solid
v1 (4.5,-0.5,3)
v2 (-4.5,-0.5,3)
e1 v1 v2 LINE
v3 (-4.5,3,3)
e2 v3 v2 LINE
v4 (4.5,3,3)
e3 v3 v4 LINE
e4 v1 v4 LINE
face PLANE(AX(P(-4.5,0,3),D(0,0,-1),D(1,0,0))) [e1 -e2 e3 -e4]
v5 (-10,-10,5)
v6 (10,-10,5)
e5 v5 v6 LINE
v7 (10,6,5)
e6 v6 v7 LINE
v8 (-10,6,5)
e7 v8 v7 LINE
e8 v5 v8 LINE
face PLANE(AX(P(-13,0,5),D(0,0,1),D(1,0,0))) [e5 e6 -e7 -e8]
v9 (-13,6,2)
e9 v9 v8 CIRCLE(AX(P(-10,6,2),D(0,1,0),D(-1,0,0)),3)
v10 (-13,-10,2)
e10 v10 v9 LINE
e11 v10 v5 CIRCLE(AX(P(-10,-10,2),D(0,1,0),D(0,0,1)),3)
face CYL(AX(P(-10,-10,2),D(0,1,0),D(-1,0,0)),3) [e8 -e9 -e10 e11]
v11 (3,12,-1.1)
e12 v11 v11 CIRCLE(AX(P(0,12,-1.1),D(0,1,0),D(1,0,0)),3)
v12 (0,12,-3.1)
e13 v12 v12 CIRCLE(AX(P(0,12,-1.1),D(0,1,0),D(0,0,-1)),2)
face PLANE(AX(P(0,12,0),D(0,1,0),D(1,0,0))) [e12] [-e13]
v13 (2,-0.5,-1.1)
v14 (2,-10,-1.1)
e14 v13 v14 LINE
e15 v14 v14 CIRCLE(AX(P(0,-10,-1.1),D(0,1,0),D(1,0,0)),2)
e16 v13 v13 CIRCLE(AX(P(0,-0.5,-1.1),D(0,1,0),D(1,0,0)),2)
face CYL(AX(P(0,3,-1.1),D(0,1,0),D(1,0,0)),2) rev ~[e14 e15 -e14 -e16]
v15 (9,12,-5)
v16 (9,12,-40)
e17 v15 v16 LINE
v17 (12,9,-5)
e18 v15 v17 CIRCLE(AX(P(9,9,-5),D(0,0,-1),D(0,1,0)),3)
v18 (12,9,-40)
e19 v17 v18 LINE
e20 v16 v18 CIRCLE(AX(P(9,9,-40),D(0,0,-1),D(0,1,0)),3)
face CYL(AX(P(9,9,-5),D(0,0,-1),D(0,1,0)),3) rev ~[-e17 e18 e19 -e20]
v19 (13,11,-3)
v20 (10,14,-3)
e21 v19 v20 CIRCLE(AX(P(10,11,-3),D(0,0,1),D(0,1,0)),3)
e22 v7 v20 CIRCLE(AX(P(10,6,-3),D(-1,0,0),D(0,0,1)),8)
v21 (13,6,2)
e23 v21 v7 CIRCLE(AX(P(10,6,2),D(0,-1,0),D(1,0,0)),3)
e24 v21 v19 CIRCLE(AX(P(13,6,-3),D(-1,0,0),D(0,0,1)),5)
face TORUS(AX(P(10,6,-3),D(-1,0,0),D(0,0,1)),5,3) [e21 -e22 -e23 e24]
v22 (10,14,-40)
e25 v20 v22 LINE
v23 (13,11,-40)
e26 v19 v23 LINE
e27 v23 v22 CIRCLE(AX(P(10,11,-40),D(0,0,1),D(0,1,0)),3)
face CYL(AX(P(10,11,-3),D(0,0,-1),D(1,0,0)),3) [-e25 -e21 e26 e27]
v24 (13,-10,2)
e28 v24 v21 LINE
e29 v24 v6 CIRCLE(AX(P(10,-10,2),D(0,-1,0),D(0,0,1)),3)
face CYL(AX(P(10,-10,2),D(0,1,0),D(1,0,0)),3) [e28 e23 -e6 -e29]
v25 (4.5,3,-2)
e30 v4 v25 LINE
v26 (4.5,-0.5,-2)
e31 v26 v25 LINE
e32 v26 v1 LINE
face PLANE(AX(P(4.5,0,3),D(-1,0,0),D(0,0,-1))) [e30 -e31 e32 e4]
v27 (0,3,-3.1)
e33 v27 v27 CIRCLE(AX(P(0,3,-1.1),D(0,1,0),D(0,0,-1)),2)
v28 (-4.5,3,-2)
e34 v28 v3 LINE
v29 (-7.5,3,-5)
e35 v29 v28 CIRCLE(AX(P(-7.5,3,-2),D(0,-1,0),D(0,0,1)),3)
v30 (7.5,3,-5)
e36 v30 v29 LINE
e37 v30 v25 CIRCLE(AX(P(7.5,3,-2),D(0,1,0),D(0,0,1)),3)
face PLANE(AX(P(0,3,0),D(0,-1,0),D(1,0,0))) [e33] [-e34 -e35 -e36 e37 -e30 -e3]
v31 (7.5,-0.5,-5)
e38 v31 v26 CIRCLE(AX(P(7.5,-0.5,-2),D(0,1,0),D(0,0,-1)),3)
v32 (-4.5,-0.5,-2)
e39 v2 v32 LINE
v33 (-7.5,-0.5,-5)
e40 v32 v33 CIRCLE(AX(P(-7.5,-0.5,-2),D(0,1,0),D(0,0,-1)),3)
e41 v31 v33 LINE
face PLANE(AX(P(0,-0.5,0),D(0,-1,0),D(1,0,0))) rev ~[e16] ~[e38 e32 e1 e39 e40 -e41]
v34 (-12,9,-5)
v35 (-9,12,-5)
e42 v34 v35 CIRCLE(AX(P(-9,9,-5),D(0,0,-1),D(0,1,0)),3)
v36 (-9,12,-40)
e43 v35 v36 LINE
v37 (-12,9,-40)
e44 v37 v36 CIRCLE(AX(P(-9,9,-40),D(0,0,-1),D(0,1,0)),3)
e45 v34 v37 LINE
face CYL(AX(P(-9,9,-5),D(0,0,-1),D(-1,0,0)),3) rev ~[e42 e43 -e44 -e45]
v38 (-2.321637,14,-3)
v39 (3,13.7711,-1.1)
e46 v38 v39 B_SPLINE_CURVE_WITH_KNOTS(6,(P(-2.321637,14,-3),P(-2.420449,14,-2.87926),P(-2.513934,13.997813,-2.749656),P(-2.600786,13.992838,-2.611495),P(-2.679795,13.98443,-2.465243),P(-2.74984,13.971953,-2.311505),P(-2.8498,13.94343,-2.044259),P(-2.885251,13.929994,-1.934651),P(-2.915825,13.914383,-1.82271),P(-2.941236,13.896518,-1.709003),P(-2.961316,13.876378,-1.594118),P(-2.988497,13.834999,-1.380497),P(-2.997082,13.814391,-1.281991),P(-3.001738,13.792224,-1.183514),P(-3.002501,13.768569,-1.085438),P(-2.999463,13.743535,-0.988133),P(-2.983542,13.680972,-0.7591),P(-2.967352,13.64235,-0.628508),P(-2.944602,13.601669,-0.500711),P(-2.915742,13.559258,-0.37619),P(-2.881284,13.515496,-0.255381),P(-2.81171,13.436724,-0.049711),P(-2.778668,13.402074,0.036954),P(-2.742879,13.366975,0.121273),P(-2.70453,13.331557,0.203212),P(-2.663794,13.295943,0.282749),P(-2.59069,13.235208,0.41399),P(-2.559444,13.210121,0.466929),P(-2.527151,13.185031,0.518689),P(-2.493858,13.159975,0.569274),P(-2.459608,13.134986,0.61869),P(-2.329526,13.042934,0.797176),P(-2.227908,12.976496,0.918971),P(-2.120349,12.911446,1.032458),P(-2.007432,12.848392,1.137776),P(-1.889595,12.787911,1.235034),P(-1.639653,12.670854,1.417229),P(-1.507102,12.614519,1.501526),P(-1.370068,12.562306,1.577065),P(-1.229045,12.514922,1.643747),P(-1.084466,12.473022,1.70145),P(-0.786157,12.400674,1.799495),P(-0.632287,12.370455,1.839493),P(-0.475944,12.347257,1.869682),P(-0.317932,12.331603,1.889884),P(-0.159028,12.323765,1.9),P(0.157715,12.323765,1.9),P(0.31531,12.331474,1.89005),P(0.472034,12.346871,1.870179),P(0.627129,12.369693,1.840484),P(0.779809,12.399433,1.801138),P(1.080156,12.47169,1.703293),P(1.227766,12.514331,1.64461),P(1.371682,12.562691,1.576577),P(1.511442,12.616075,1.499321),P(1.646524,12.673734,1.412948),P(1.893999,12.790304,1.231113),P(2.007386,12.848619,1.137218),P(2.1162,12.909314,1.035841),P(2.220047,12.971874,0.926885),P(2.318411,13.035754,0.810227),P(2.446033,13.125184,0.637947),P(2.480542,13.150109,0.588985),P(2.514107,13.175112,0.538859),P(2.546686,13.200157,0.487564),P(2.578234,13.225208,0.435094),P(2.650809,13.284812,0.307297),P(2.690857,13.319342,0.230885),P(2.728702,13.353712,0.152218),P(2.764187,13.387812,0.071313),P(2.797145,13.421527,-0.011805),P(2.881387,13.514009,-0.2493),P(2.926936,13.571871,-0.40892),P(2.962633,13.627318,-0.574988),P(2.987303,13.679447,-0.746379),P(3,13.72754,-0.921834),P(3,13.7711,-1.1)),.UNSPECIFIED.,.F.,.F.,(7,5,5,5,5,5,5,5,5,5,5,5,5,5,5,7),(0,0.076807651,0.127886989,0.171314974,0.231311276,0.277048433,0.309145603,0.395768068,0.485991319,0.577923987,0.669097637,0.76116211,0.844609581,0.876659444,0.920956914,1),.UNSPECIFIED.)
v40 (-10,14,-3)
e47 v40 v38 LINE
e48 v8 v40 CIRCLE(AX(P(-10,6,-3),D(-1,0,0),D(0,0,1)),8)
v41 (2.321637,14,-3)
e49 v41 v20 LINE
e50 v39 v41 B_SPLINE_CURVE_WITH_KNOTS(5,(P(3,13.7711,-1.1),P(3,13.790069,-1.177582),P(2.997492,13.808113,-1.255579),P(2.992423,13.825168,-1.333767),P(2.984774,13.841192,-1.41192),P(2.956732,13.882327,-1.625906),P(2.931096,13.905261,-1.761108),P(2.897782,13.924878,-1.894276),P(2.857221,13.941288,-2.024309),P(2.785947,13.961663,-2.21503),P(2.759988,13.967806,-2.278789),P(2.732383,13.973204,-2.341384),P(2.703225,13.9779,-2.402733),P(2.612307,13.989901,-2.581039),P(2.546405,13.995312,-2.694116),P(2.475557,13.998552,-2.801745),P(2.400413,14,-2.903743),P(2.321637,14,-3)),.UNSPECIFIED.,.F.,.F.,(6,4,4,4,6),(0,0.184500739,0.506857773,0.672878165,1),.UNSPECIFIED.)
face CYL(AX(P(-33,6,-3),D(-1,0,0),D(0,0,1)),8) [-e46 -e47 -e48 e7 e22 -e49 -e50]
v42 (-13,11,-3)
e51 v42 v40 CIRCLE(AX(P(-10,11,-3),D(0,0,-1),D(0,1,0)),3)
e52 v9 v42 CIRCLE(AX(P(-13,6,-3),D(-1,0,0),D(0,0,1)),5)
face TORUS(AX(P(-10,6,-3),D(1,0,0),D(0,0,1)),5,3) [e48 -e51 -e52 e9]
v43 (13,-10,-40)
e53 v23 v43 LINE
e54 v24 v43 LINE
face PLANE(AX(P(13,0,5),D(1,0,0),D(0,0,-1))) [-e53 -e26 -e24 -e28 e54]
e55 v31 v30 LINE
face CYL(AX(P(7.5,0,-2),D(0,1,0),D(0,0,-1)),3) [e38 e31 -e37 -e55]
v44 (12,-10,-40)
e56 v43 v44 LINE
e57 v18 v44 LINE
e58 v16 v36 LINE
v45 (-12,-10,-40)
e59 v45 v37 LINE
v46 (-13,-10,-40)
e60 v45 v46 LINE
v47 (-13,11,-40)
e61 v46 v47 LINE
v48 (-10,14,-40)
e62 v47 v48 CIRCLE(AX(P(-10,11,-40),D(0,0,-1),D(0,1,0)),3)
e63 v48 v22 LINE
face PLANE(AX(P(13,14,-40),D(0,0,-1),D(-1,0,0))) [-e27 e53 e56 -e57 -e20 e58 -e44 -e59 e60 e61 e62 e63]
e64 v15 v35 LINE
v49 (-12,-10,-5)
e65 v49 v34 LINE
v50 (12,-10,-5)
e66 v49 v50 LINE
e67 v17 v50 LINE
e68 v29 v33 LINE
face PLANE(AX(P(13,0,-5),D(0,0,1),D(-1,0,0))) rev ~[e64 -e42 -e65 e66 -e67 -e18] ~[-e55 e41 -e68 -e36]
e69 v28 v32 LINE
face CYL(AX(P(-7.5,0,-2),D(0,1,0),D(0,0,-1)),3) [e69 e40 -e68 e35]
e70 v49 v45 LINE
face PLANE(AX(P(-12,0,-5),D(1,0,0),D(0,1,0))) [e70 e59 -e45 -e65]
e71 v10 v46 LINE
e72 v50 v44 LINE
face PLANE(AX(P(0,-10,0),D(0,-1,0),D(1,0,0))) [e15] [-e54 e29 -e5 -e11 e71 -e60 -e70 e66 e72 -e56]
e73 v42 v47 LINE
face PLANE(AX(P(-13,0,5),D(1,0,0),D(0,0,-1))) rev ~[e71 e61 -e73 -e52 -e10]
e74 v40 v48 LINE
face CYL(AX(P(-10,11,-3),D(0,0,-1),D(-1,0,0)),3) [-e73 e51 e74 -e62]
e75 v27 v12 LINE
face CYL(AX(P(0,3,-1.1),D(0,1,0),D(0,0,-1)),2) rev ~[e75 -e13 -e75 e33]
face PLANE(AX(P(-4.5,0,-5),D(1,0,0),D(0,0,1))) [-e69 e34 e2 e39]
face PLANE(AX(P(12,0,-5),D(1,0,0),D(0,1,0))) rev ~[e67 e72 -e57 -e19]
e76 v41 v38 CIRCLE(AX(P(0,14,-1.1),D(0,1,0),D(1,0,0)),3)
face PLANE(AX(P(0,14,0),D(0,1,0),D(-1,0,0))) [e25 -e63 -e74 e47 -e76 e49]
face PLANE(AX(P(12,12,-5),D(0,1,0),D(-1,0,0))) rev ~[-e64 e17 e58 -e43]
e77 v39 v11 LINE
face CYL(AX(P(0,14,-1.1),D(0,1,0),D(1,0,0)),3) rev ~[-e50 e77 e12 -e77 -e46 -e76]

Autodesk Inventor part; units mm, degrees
ref_plane "YZ Plane" through (0, 0, 0) normal (1, 0, 0) x (0, 1, 0)
ref_plane "XZ Plane" through (0, 0, 0) normal (0, 1, 0) x (-1, 0, 0)
ref_plane "XY Plane" through (0, 0, 0) normal (0, 0, 1) x (1, 0, 0)
sketch "Sketch1" plane through (0, 0, 0) normal (0, 1, 0) x (-1, 0, 0)
  line L0 (-13, -5) -> (13, -5)
  line L1 (13, -5) -> (13, 5)
  line L2 (13, 5) -> (-13, 5)
  line L3 (-13, 5) -> (-13, -5)
  line L4 (-13, -5) -> (13, 5) construction
  line L5 (13, -5) -> (-13, 5) construction
  point P0 (0, 0)
  dimension "d0" = 26
  dimension "d1" = 10
extrude "Extrusion1" add sketch "Sketch1" along normal blind 14
sketch "Sketch2" plane through (0, 0, 0) normal (0, -1, 0) x (1, 0, 0)
  line L0 (13, -5) -> (-13, -5) projected
  line L1 (13, 5) -> (13, -5) projected
  line L2 (-13, 5) -> (13, 5) projected
  line L3 (-13, -5) -> (-13, 5) projected
  line L4 (-4.5, 3) -> (4.5, 3)
  line L5 (4.5, 3) -> (4.5, -5)
  line L6 (4.5, -5) -> (-4.5, -5)
  line L7 (-4.5, -5) -> (-4.5, 3)
  line L8 (-4.5, 3) -> (4.5, -5) construction
  line L9 (4.5, 3) -> (-4.5, -5) construction
  point P0 (0, 0)
  point P1 (0, -1)
  dimension "d4" = 9
  dimension "d5" = 4.5
  dimension "d6" = 8
extrude "Extrusion2" cut sketch "Sketch2" against normal blind 3 contours L0 L7 L4 L5
fillet "Fillet1" radius 3 2 edges at (-4.5, 1.5, -5) (4.5, 1.5, -5)
sketch "Sketch3" plane through (0, 3, 0) normal (0, -1, 0) x (1, 0, 0)
  line L0 (-4.5, 3) -> (4.5, 3) projected
  point P0 (0, 0)
  point P1 (0, -1.1)
  dimension "d10" = 4.1
hole "Hole1" at (0, 3, -1.1) direction (0, 1, 0) diameter 4 end through all
sketch "Sketch4" plane through (13, 14, -5) normal (0, 0, -1) x (-1, 0, 0)
  line L0 (5.5, -11) -> (20.5, -11) projected
  line L1 (20.5, -14) -> (20.5, -11) projected
  line L2 (20.5, -14) -> (26, -14) projected
  line L3 (26, -14) -> (26, 0) projected
  line L4 (0, 0) -> (26, 0) projected
  line L5 (0, -14) -> (0, 0) projected
  line L6 (0, -14) -> (5.5, -14) projected
  line L7 (5.5, -11) -> (5.5, -14) projected
  line L8 (0, -14) -> (0, 0) projected
  line L9 (0, -14) -> (1, -14)
  line L10 (1, -14) -> (1, 0)
  line L11 (1, 0) -> (0, 0)
  line L12 (0, 0) -> (0, -14)
  line L13 (20.5, -14) -> (26, -14) projected
  line L14 (26, -14) -> (25, -14)
  line L15 (25, -14) -> (25, 0)
  line L16 (25, 0) -> (26, 0)
  line L17 (26, 0) -> (26, -14)
  line L18 (1, -2) -> (25, -2)
  line L19 (25, -2) -> (25, 0)
  line L20 (25, 0) -> (1, 0)
  line L21 (1, 0) -> (1, -2)
  point P0 (13, -14)
  dimension "d18" = 1
  dimension "d19" = 1
  dimension "d20" = 2
extrude "Extrusion3" add sketch "Sketch4" along normal blind 35 contours L6 L5 L4 L10 | L15 L4 L3 L2 | L10 L4 L15 L18
sketch "Sketch5" plane through (0, 14, 0) normal (0, 1, 0) x (1, 0, 0)
  circle A0 centre (0, 1.1) radius 2 projected
  circle A1 centre (0, 1.1) radius 3
  point P0 (0, 0)
  dimension "d23" = 6
extrude "Extrusion4" cut sketch "Sketch5" against normal blind 2
fillet "Fillet2" radius 8 1 edges at (0, 14, 5)
sketch "Sketch6" plane through (0, 0, 0) normal (0, -1, 0) x (1, 0, 0)
  arc A0 (4.5, -2) -> (7.5, -5) centre (7.5, -2) ccw projected
  line L0 (12, -5) -> (7.5, -5) projected
  line L1 (12, -5) -> (12, -40) projected
  line L2 (13, -40) -> (12, -40) projected
  line L3 (13, 5) -> (13, -40) projected
  line L4 (-13, 5) -> (13, 5) projected
  line L5 (-13, 5) -> (-13, -40) projected
  line L6 (-12, -40) -> (-13, -40) projected
  line L7 (-12, -5) -> (-12, -40) projected
  line L8 (-7.5, -5) -> (-12, -5) projected
  arc A1 (-7.5, -5) -> (-4.5, -2) centre (-7.5, -2) ccw projected
  line L9 (-4.5, -2) -> (-4.5, 3) projected
  line L10 (-4.5, 3) -> (4.5, 3) projected
  line L11 (4.5, 3) -> (4.5, -2) projected
  point P0 (0, 0)
extrude "Extrusion5" add sketch "Sketch6" along normal blind 10
fillet "Fillet3" radius 3 2 edges at (12, 12, -22.5) (-12, 12, -22.5)
fillet "Fillet4" radius 3 6 edges at (13, 11.6569, 2.6569) (13, -2, 5) (13, 14, -21.5) (-13, 11.6569, 2.6569) (-13, -2, 5) (-13, 14, -21.5)
sketch "Sketch7" plane through (0, -10, 0) normal (0, -1, 0) x (1, 0, 0)
  point P0 (0, 0)
sketch "Sketch8" plane through (0, -10, 0) normal (0, -1, 0) x (1, 0, 0)
  line L0 (9.9543, -5) -> (-10.0457, -5)
  line L1 (-10.0457, -5) -> (-10.0457, 4.3303)
  line L2 (-10.0457, 4.3303) -> (9.9543, 4.3303)
  line L3 (9.9543, 4.3303) -> (9.9543, -5)
  line L4 (7.5, -5) -> (-7.5, -5) projected
  point P0 (0, 0)
  dimension "d33" = 20
  dimension "d34" = 0
extrude "Extrusion6" add sketch "Sketch8" against normal blind 9.5
sketch "Sketch9" plane through (0, 3, 0) normal (0, -1, 0) x (1, 0, 0)
  circle A0 centre (0, -1.1) radius 2 projected
  point P0 (0, 0)
extrude "Extrusion7" cut sketch "Sketch9" along normal through all
properties part number "little_rays_shell"
